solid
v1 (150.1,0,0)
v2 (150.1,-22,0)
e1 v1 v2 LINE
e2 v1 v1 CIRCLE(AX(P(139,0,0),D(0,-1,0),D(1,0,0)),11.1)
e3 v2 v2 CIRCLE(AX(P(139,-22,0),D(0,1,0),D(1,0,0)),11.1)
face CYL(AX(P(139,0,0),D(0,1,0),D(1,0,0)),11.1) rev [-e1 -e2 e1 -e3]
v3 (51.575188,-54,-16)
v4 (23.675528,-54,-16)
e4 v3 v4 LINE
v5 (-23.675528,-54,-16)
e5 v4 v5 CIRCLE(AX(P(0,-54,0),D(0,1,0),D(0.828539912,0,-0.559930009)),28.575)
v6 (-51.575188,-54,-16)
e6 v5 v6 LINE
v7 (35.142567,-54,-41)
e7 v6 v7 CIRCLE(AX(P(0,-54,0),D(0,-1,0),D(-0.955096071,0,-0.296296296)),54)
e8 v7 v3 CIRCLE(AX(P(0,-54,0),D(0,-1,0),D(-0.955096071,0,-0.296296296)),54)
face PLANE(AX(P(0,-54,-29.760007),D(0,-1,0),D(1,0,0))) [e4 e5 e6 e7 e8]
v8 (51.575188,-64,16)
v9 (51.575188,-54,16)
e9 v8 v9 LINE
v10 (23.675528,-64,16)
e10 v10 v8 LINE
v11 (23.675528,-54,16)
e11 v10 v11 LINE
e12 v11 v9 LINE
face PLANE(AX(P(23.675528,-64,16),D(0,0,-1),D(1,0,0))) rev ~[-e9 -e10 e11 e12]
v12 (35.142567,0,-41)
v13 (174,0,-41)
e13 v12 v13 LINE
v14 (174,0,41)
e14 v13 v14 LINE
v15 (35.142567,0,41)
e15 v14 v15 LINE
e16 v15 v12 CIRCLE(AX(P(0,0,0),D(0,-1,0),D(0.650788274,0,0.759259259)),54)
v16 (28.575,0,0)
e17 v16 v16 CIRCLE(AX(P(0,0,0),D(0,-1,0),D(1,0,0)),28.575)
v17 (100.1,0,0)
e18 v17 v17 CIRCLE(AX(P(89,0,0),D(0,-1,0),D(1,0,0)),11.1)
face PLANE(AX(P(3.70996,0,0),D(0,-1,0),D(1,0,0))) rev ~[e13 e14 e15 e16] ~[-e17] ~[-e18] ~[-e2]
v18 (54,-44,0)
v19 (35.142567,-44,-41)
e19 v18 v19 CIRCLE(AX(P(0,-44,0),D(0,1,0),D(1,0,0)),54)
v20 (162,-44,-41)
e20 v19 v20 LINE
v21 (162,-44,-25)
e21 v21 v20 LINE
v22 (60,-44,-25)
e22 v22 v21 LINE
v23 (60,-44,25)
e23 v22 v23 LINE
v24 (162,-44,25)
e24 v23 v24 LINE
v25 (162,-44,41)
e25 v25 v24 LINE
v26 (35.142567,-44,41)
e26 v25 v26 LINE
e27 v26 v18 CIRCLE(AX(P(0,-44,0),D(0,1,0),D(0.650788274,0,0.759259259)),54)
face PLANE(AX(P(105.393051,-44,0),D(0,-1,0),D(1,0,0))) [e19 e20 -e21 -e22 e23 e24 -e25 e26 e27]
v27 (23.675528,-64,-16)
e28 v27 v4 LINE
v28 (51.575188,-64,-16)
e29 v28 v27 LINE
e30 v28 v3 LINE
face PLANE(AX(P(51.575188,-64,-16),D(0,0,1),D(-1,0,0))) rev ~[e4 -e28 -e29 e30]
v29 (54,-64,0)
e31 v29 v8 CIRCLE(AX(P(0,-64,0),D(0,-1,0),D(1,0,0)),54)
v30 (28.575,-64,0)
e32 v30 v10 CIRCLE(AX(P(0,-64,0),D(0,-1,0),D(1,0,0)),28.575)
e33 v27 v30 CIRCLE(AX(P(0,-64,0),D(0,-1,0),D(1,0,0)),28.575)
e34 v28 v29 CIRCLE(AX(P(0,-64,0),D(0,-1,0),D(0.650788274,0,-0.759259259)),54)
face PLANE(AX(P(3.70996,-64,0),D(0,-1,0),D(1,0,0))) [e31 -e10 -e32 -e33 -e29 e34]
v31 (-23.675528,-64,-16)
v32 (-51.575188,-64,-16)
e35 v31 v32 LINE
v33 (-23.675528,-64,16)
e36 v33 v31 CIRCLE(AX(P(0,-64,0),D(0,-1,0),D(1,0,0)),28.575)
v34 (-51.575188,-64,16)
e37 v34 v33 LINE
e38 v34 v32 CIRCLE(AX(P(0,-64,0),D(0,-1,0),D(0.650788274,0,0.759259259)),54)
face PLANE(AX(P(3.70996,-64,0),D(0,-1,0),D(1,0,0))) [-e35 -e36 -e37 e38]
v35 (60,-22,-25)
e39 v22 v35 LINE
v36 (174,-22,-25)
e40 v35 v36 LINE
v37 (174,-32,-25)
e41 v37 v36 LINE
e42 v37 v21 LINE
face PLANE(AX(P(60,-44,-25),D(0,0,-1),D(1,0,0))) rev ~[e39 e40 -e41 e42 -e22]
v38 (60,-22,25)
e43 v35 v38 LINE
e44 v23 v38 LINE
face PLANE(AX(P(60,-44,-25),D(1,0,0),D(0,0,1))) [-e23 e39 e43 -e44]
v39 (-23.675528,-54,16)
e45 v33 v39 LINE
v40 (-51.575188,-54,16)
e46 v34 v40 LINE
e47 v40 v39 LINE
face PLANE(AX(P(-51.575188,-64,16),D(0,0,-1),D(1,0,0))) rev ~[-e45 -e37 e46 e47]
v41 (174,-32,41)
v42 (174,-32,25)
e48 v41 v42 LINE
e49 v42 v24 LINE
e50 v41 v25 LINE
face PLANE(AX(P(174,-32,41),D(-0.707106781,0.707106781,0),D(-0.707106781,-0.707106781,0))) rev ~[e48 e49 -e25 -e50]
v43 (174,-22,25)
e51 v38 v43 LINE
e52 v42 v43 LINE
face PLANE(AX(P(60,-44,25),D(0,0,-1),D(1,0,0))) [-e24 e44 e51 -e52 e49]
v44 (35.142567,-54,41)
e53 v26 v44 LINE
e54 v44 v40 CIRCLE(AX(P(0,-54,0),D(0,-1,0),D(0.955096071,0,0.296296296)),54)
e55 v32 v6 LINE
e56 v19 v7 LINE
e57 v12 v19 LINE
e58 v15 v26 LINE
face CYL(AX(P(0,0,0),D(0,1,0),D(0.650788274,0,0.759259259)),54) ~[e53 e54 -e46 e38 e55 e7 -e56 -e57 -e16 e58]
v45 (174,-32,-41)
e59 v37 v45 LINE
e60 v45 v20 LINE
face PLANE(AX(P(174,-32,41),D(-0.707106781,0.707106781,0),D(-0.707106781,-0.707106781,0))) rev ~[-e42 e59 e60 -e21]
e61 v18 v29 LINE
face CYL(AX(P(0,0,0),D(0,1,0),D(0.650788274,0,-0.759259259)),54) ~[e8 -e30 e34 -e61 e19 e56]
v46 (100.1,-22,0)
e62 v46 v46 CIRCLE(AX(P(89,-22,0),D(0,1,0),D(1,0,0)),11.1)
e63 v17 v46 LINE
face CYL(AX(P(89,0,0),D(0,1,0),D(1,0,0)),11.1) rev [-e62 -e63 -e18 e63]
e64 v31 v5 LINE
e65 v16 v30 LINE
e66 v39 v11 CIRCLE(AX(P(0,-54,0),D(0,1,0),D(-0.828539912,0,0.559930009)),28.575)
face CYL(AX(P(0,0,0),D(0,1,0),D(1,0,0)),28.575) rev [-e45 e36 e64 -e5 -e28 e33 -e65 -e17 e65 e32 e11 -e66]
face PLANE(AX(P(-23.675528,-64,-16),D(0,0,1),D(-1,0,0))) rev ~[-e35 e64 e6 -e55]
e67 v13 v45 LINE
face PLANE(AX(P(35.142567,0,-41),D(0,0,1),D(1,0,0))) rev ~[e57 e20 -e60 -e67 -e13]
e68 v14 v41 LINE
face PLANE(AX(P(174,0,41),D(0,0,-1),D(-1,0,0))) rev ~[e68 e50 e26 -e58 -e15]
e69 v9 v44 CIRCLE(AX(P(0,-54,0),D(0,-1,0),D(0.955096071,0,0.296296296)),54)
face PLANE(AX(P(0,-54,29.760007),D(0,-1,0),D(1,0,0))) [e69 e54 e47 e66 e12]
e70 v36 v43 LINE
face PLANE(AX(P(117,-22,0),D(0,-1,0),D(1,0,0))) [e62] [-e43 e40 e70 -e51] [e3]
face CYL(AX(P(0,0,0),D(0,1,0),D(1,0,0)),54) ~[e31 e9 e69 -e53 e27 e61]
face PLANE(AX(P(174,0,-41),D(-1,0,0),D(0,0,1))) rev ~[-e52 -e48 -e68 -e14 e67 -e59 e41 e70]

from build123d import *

# Parameters (mm, degrees)
F0_R     = 11.1
F1_DEPTH = 44
F0_R_2   = 28.575
F2_DEPTH = 64
F4_DEPTH = 95.001
F5_W     = 114
F5_H     = 50
F6_DEPTH = 22
F8_DEPTH = 10


with BuildPart() as f1:
    # F0 (on Front) → F1 (new body)
    with BuildSketch(Plane.XZ):
        with BuildLine():
            ThreePointArc((35.1425667816, 41), (49.0596504584, 22.5643678594), (54, 0))
            ThreePointArc((54, 0), (49.0596504584, -22.5643678594), (35.1425667816, -41))
            Line((35.1425667816, -41), (174, -41))
            Line((174, -41), (174, 41))
            Line((174, 41), (35.1425667816, 41))
        make_face()
        with Locations((89, 0)):
            Circle(F0_R, mode=Mode.SUBTRACT)
        with Locations((139, 0)):
            Circle(F0_R, mode=Mode.SUBTRACT)
    extrude(amount=F1_DEPTH)

    # F0 (on Front) → F2 (join)
    with BuildSketch(Plane.XZ):
        with BuildLine():
            ThreePointArc((35.1425667816, -41), (49.0596504584, -22.5643678594), (54, 0))
            ThreePointArc((54, 0), (49.0596504584, 22.5643678594), (35.1425667816, 41))
            ThreePointArc((35.1425667816, 41), (-54, 0), (35.1425667816, -41))
        make_face()
        Circle(F0_R_2, mode=Mode.SUBTRACT)
    extrude(amount=F2_DEPTH)

    # F3 (on face) → F4 (cut, through all)
    with BuildSketch(Plane.XY.offset(41)):
        Polygon((174, -44), (174, -32), (162, -44), align=None)
    extrude(amount=-F4_DEPTH, mode=Mode.SUBTRACT)

    # F5 (on face) → F6 (cut)
    with BuildSketch(Plane.XZ.offset(44)):
        with Locations((117, 0)):
            Rectangle(F5_W, F5_H)
    extrude(amount=-F6_DEPTH, mode=Mode.SUBTRACT)

    # F7 (on face) → F8 (cut)
    with BuildSketch(Plane.XZ.offset(64)):
        with BuildLine():
            ThreePointArc((51.5751878329, 16), (0, 54), (-51.5751878329, 16))
            Line((-51.5751878329, 16), (-23.6755279772, 16))
            ThreePointArc((-23.6755279772, 16), (0, 28.575), (23.6755279772, 16))
            Line((23.6755279772, 16), (51.5751878329, 16))
        make_face()
        with BuildLine():
            Line((-23.6755279772, -16), (-51.5751878329, -16))
            ThreePointArc((-51.5751878329, -16), (0, -54), (51.5751878329, -16))
            Line((51.5751878329, -16), (23.6755279772, -16))
            ThreePointArc((23.6755279772, -16), (0, -28.575), (-23.6755279772, -16))
        make_face()
    extrude(amount=-F8_DEPTH, mode=Mode.SUBTRACT)


solid = f1.part
